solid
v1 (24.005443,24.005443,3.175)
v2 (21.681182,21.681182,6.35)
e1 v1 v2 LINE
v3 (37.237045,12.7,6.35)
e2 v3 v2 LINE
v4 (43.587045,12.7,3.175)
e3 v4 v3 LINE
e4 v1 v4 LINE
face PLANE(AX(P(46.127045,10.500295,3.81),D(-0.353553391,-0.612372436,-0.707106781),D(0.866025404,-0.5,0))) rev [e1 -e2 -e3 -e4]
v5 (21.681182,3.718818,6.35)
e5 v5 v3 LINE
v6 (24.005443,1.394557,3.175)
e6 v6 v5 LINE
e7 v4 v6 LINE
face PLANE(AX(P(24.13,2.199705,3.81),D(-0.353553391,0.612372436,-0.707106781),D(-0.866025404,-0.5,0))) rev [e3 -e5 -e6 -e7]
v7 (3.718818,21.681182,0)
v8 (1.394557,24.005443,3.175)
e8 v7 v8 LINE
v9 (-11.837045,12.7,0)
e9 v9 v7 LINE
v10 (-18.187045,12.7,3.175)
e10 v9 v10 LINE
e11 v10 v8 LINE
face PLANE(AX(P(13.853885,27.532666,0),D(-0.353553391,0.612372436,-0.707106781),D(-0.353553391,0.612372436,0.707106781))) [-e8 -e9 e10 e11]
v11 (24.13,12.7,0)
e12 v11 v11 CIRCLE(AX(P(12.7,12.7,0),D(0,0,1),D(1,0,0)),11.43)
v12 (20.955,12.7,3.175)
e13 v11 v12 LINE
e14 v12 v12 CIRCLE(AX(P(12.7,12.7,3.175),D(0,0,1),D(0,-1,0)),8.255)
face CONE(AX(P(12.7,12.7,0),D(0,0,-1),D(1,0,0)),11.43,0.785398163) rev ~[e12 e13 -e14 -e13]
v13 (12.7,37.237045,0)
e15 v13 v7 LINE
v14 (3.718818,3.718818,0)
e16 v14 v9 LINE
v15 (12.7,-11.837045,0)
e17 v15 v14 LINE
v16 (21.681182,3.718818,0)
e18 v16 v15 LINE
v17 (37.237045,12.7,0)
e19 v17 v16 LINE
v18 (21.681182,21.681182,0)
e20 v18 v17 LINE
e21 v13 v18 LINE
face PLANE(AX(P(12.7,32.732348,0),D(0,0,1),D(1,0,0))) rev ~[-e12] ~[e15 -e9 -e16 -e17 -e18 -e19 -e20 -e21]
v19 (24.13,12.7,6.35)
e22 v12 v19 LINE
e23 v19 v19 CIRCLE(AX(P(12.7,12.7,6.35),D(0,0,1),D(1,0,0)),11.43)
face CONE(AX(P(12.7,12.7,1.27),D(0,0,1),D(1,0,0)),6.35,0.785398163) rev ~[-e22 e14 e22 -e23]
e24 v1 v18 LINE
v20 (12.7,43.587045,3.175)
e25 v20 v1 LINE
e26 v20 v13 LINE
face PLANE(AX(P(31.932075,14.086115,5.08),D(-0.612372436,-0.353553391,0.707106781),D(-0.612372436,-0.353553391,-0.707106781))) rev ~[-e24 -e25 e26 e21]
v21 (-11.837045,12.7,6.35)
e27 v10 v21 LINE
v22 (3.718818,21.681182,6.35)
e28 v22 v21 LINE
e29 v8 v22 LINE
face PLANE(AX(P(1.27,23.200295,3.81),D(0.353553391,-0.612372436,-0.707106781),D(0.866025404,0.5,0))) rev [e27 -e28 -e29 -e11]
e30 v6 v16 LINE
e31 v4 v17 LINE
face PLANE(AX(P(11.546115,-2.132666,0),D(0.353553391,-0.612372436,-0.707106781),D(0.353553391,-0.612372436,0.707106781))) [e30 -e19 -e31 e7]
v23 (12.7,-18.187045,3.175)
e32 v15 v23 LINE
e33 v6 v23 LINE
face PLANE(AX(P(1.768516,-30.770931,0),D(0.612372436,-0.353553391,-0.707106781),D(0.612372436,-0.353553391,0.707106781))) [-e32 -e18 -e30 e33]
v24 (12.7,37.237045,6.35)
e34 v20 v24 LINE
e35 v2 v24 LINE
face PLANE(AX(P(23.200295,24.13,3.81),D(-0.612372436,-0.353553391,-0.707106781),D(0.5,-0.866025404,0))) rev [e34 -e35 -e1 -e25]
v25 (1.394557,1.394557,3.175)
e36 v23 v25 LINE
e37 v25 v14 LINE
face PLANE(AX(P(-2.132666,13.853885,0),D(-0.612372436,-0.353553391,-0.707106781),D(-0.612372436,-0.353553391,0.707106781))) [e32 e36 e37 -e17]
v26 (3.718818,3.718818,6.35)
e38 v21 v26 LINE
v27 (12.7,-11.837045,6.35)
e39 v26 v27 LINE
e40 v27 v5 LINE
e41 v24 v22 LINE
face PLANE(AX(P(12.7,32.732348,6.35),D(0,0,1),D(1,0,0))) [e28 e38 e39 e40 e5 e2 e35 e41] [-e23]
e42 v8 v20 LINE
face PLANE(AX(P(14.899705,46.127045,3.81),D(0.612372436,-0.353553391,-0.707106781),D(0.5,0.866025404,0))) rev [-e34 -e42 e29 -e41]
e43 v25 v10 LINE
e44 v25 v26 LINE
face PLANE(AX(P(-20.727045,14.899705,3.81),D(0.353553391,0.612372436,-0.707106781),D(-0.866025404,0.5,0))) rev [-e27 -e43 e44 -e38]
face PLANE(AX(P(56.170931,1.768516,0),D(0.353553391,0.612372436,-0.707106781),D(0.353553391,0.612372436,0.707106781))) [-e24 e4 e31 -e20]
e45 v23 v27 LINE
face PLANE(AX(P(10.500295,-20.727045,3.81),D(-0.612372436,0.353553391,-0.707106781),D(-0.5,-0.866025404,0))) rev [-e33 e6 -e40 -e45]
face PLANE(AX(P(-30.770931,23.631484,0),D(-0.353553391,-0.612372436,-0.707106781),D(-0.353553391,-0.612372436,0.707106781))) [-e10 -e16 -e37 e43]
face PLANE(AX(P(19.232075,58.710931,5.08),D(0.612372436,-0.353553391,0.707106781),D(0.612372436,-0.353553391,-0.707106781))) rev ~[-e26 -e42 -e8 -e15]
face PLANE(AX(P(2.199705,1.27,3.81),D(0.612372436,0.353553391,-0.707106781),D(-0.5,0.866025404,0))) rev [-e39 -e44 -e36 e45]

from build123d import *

# Parameters (mm, degrees)
F0_W         = 25.4
F0_H         = 25.4
F0_R         = 6.35
F1_DEPTH     = 6.35
F2_SIZE      = 5.08
F3_T4_DEPTH  = 51.5282991577
F3_T9_DEPTH  = 51.5282991577
F3_T14_DEPTH = 51.5282991577
F3_T19_DEPTH = 51.5282991577
F3_T24_DEPTH = 51.5282991577
F3_T29_DEPTH = 51.5282991577
F3_T34_DEPTH = 51.5282991577
F3_T39_DEPTH = 51.5282991577
F3_T47_DEPTH = 51.5282991577
F3_T51_DEPTH = 51.5282991577
F3_T58_DEPTH = 51.5282991577
F3_T62_DEPTH = 51.5282991577
F3_T69_DEPTH = 51.5282991577
F3_T73_DEPTH = 51.5282991577
F3_T80_DEPTH = 51.5282991577
F3_T84_DEPTH = 51.5282991577


# Not quite as in the source:
# - a fillet or chamfer that OpenCascade refuses, or shapes differently, is made with other operations: its cross-section is extruded or revolved along the edge and cut away or added


with BuildPart() as f1:
    # F0 (on Top) → F1 (new body)
    with BuildSketch(Plane.XY):
        Polygon((12.7, 47.3970452561), (0, 25.4), (25.4, 25.4), align=None)
        with Locations((12.7, 12.7)):
            Rectangle(F0_W, F0_H)
        with Locations((12.7, 12.7)):
            Circle(F0_R, mode=Mode.SUBTRACT)
        Polygon((25.4, 25.4), (25.4, 0), (47.3970452561, 12.7), align=None)
        Polygon((25.4, 0), (0, 0), (12.7, -21.9970452561), align=None)
        Polygon((-21.9970452561, 12.7), (0, 0), (0, 25.4), align=None)
    extrude(amount=F1_DEPTH)

    # F2
    f2_edges = [f1.edges().sort_by_distance(p)[0] for p in [
        (6.35, 36.398523, 6.35),
        (-10.998523, 19.05, 6.35),
        (-10.998523, 6.35, 6.35),
        (6.35, -10.998523, 6.35),
        (19.05, -10.998523, 6.35),
        (36.398523, 6.35, 6.35),
        (36.398523, 19.05, 6.35),
        (19.05, 36.398523, 6.35),
        (6.35, 12.7, 6.35),
    ]]
    chamfer(f2_edges, length=F2_SIZE)

    # F3: chamfer of 5.08 on 9 edges, made by hand


with BuildPart() as f3_tool2:
    # F3_s3 → F3_t4 (new body)
    with BuildSketch(Plane(origin=(41.3624080422, -23.8805974175, 0), x_dir=(0, 0, 1), z_dir=(-0.8660254038, 0.5, 0))):
        Polygon((0, 29.6170452561), (5.08, 34.6970452561), (0, 34.6970452561), align=None)
    extrude(amount=F3_T4_DEPTH)

    split(bisect_by=Plane(origin=(30.0485226281, 17.3485226281, 0), x_dir=(0, 0, 1), z_dir=(0.8660254038, 0.5, 0)), keep=Keep.TOP)


with BuildPart() as f1_1:
    add(f1.part)

    # F3_t1: cut F3_tool2
    add(f3_tool2.part, mode=Mode.SUBTRACT)


with BuildPart() as f3_tool7:
    # F3_s8 → F3_t9 (new body)
    with BuildSketch(Plane(origin=(30.2305974175, 52.3609306703, 0), x_dir=(0, 0, 1), z_dir=(-0.5, -0.8660254038, 0))):
        Polygon((5.08, 12.7), (0, 7.62), (0, 12.7), align=None)
    extrude(amount=F3_T9_DEPTH)

    split(bisect_by=Plane(origin=(-10.9985226281, 19.05, 0), x_dir=(0, 0, 1), z_dir=(-0.5, 0.8660254038, 0)), keep=Keep.TOP)


with BuildPart() as f1_2:
    add(f1_1.part)

    # F3_t6: cut F3_tool7
    add(f3_tool7.part, mode=Mode.SUBTRACT)


with BuildPart() as f3_tool12:
    # F3_s13 → F3_t14 (new body)
    with BuildSketch(Plane(origin=(22.3124080422, 12.8820747894, 0), x_dir=(0, 0, 1), z_dir=(-0.8660254038, -0.5, 0))):
        Polygon((0, 16.9170452561), (5.08, 21.9970452561), (0, 21.9970452561), align=None)
    extrude(amount=F3_T14_DEPTH)

    split(bisect_by=Plane(origin=(-10.9985226281, 6.35, 0), x_dir=(0, 0, 1), z_dir=(-0.8660254038, 0.5, 0)), keep=Keep.TOP)


with BuildPart() as f1_3:
    add(f1_2.part)

    # F3_t11: cut F3_tool12
    add(f3_tool12.part, mode=Mode.SUBTRACT)


with BuildPart() as f3_tool17:
    # F3_s18 → F3_t19 (new body)
    with BuildSketch(Plane(origin=(-33.3109306703, 19.2320747894, 0), x_dir=(0, 0, 1), z_dir=(0.8660254038, -0.5, 0))):
        Polygon((0, -5.08), (5.08, 0), (0, 0), align=None)
    extrude(amount=F3_T19_DEPTH)

    split(bisect_by=Plane(origin=(0, 0, 0), x_dir=(0, 0, 1), z_dir=(-0.8660254038, -0.5, 0)), keep=Keep.TOP)


with BuildPart() as f1_4:
    add(f1_3.part)

    # F3_t16: cut F3_tool17
    add(f3_tool17.part, mode=Mode.SUBTRACT)


with BuildPart() as f3_tool22:
    # F3_s23 → F3_t24 (new body)
    with BuildSketch(Plane(origin=(-6.5320747894, 11.3138854141, 0), x_dir=(0, 0, 1), z_dir=(0.5, -0.8660254038, 0))):
        Polygon((0, -5.08), (5.08, 0), (0, 0), align=None)
    extrude(amount=F3_T24_DEPTH)

    split(bisect_by=Plane(origin=(0, 0, 0), x_dir=(0, 0, 1), z_dir=(-0.5, -0.8660254038, 0)), keep=Keep.TOP)


with BuildPart() as f1_5:
    add(f1_4.part)

    # F3_t21: cut F3_tool22
    add(f3_tool22.part, mode=Mode.SUBTRACT)


with BuildPart() as f3_tool27:
    # F3_s28 → F3_t29 (new body)
    with BuildSketch(Plane(origin=(-12.8820747894, -22.3124080422, 0), x_dir=(0, 0, 1), z_dir=(0.5, 0.8660254038, 0))):
        Polygon((0, 16.9170452561), (5.08, 21.9970452561), (0, 21.9970452561), align=None)
    extrude(amount=F3_T29_DEPTH)

    split(bisect_by=Plane(origin=(6.35, -10.9985226281, 0), x_dir=(0, 0, 1), z_dir=(0.5, -0.8660254038, 0)), keep=Keep.TOP)


with BuildPart() as f1_6:
    add(f1_5.part)

    # F3_t26: cut F3_tool27
    add(f3_tool27.part, mode=Mode.SUBTRACT)


with BuildPart() as f3_tool32:
    # F3_s33 → F3_t34 (new body)
    with BuildSketch(Plane(origin=(7.7361145859, 4.4664478386, 0), x_dir=(0, 0, 1), z_dir=(0.8660254038, 0.5, 0))):
        Polygon((0, 7.62), (5.08, 12.7), (0, 12.7), align=None)
    extrude(amount=F3_T34_DEPTH)

    split(bisect_by=Plane(origin=(19.05, -10.9985226281, 0), x_dir=(0, 0, 1), z_dir=(0.8660254038, -0.5, 0)), keep=Keep.TOP)


with BuildPart() as f1_7:
    add(f1_6.part)

    # F3_t31: cut F3_tool32
    add(f3_tool32.part, mode=Mode.SUBTRACT)


with BuildPart() as f3_tool37:
    # F3_s38 → F3_t39 (new body)
    with BuildSketch(Plane(origin=(1.8835521614, -3.2624080422, 0), x_dir=(0, 0, 1), z_dir=(-0.5, 0.8660254038, 0))):
        Polygon((5.08, 34.6970452561), (0, 29.6170452561), (0, 34.6970452561), align=None)
    extrude(amount=F3_T39_DEPTH)

    split(bisect_by=Plane(origin=(17.3485226281, 30.0485226281, 0), x_dir=(0, 0, 1), z_dir=(0.5, 0.8660254038, 0)), keep=Keep.TOP)


with BuildPart() as f1_8:
    add(f1_7.part)

    # F3_t36: cut F3_tool37
    add(f3_tool37.part, mode=Mode.SUBTRACT)

    # F3_s41 → F3_t42 (revolve, cut)
    with BuildSketch(Plane.XZ.offset(-12.7)):
        Polygon((24.13, 0), (19.05, 5.08), (19.05, 0), align=None)
    revolve(axis=Axis((12.7, 12.7, 0), (0, 0, 1)), mode=Mode.SUBTRACT)


with BuildPart() as f3_tool45:
    # F3_s46 → F3_t47 (new body)
    with BuildSketch(Plane(origin=(1.8835521614, -3.2624080422, 0), x_dir=(0, 0, 1), z_dir=(-0.5, 0.8660254038, 0))):
        Polygon((5.08, 34.6970452561), (0, 29.6170452561), (0, 34.6970452561), align=None)
    extrude(amount=F3_T47_DEPTH)

    split(bisect_by=Plane(origin=(17.3485226281, 30.0485226281, 0), x_dir=(0, 0, 1), z_dir=(-0.5, -0.8660254038, 0)), keep=Keep.TOP)


with BuildPart() as f3_tool49:
    # F3_s50 → F3_t51 (new body)
    with BuildSketch(Plane(origin=(41.3624080422, -23.8805974175, 0), x_dir=(0, 0, 1), z_dir=(-0.8660254038, 0.5, 0))):
        Polygon((0, 29.6170452561), (5.08, 34.6970452561), (0, 34.6970452561), align=None)
    extrude(amount=F3_T51_DEPTH)

    split(bisect_by=Plane(origin=(30.0485226281, 17.3485226281, 0), x_dir=(0, 0, 1), z_dir=(-0.8660254038, -0.5, 0)), keep=Keep.TOP)


with BuildPart() as f3_tool45_1:
    add(f3_tool45.part)

    # F3_t53: intersect F3_tool49
    add(f3_tool49.part, mode=Mode.INTERSECT)


with BuildPart() as f1_9:
    add(f1_8.part)

    # F3_t43: cut F3_tool45
    add(f3_tool45_1.part, mode=Mode.SUBTRACT)


with BuildPart() as f3_tool56:
    # F3_s57 → F3_t58 (new body)
    with BuildSketch(Plane(origin=(30.2305974175, 52.3609306703, 0), x_dir=(0, 0, 1), z_dir=(-0.5, -0.8660254038, 0))):
        Polygon((5.08, 12.7), (0, 7.62), (0, 12.7), align=None)
    extrude(amount=F3_T58_DEPTH)

    split(bisect_by=Plane(origin=(-10.9985226281, 19.05, 0), x_dir=(0, 0, 1), z_dir=(0.5, -0.8660254038, 0)), keep=Keep.TOP)


with BuildPart() as f3_tool60:
    # F3_s61 → F3_t62 (new body)
    with BuildSketch(Plane(origin=(22.3124080422, 12.8820747894, 0), x_dir=(0, 0, 1), z_dir=(-0.8660254038, -0.5, 0))):
        Polygon((0, 16.9170452561), (5.08, 21.9970452561), (0, 21.9970452561), align=None)
    extrude(amount=F3_T62_DEPTH)

    split(bisect_by=Plane(origin=(-10.9985226281, 6.35, 0), x_dir=(0, 0, 1), z_dir=(0.8660254038, -0.5, 0)), keep=Keep.TOP)


with BuildPart() as f3_tool56_1:
    add(f3_tool56.part)

    # F3_t64: intersect F3_tool60
    add(f3_tool60.part, mode=Mode.INTERSECT)


with BuildPart() as f1_10:
    add(f1_9.part)

    # F3_t54: cut F3_tool56
    add(f3_tool56_1.part, mode=Mode.SUBTRACT)


with BuildPart() as f3_tool67:
    # F3_s68 → F3_t69 (new body)
    with BuildSketch(Plane(origin=(-33.3109306703, 19.2320747894, 0), x_dir=(0, 0, 1), z_dir=(0.8660254038, -0.5, 0))):
        Polygon((0, -5.08), (5.08, 0), (0, 0), align=None)
    extrude(amount=F3_T69_DEPTH)

    split(bisect_by=Plane(origin=(0, 0, 0), x_dir=(0, 0, 1), z_dir=(0.8660254038, 0.5, 0)), keep=Keep.TOP)


with BuildPart() as f3_tool71:
    # F3_s72 → F3_t73 (new body)
    with BuildSketch(Plane(origin=(-6.5320747894, 11.3138854141, 0), x_dir=(0, 0, 1), z_dir=(0.5, -0.8660254038, 0))):
        Polygon((0, -5.08), (5.08, 0), (0, 0), align=None)
    extrude(amount=F3_T73_DEPTH)

    split(bisect_by=Plane(origin=(0, 0, 0), x_dir=(0, 0, 1), z_dir=(0.5, 0.8660254038, 0)), keep=Keep.TOP)


with BuildPart() as f3_tool67_1:
    add(f3_tool67.part)

    # F3_t75: intersect F3_tool71
    add(f3_tool71.part, mode=Mode.INTERSECT)


with BuildPart() as f1_11:
    add(f1_10.part)

    # F3_t65: cut F3_tool67
    add(f3_tool67_1.part, mode=Mode.SUBTRACT)


with BuildPart() as f3_tool78:
    # F3_s79 → F3_t80 (new body)
    with BuildSketch(Plane(origin=(-12.8820747894, -22.3124080422, 0), x_dir=(0, 0, 1), z_dir=(0.5, 0.8660254038, 0))):
        Polygon((0, 16.9170452561), (5.08, 21.9970452561), (0, 21.9970452561), align=None)
    extrude(amount=F3_T80_DEPTH)

    split(bisect_by=Plane(origin=(6.35, -10.9985226281, 0), x_dir=(0, 0, 1), z_dir=(-0.5, 0.8660254038, 0)), keep=Keep.TOP)


with BuildPart() as f3_tool82:
    # F3_s83 → F3_t84 (new body)
    with BuildSketch(Plane(origin=(7.7361145859, 4.4664478386, 0), x_dir=(0, 0, 1), z_dir=(0.8660254038, 0.5, 0))):
        Polygon((0, 7.62), (5.08, 12.7), (0, 12.7), align=None)
    extrude(amount=F3_T84_DEPTH)

    split(bisect_by=Plane(origin=(19.05, -10.9985226281, 0), x_dir=(0, 0, 1), z_dir=(-0.8660254038, 0.5, 0)), keep=Keep.TOP)


with BuildPart() as f3_tool78_1:
    add(f3_tool78.part)

    # F3_t86: intersect F3_tool82
    add(f3_tool82.part, mode=Mode.INTERSECT)


with BuildPart() as f1_12:
    add(f1_11.part)

    # F3_t76: cut F3_tool78
    add(f3_tool78_1.part, mode=Mode.SUBTRACT)


solid = f1_12.part
